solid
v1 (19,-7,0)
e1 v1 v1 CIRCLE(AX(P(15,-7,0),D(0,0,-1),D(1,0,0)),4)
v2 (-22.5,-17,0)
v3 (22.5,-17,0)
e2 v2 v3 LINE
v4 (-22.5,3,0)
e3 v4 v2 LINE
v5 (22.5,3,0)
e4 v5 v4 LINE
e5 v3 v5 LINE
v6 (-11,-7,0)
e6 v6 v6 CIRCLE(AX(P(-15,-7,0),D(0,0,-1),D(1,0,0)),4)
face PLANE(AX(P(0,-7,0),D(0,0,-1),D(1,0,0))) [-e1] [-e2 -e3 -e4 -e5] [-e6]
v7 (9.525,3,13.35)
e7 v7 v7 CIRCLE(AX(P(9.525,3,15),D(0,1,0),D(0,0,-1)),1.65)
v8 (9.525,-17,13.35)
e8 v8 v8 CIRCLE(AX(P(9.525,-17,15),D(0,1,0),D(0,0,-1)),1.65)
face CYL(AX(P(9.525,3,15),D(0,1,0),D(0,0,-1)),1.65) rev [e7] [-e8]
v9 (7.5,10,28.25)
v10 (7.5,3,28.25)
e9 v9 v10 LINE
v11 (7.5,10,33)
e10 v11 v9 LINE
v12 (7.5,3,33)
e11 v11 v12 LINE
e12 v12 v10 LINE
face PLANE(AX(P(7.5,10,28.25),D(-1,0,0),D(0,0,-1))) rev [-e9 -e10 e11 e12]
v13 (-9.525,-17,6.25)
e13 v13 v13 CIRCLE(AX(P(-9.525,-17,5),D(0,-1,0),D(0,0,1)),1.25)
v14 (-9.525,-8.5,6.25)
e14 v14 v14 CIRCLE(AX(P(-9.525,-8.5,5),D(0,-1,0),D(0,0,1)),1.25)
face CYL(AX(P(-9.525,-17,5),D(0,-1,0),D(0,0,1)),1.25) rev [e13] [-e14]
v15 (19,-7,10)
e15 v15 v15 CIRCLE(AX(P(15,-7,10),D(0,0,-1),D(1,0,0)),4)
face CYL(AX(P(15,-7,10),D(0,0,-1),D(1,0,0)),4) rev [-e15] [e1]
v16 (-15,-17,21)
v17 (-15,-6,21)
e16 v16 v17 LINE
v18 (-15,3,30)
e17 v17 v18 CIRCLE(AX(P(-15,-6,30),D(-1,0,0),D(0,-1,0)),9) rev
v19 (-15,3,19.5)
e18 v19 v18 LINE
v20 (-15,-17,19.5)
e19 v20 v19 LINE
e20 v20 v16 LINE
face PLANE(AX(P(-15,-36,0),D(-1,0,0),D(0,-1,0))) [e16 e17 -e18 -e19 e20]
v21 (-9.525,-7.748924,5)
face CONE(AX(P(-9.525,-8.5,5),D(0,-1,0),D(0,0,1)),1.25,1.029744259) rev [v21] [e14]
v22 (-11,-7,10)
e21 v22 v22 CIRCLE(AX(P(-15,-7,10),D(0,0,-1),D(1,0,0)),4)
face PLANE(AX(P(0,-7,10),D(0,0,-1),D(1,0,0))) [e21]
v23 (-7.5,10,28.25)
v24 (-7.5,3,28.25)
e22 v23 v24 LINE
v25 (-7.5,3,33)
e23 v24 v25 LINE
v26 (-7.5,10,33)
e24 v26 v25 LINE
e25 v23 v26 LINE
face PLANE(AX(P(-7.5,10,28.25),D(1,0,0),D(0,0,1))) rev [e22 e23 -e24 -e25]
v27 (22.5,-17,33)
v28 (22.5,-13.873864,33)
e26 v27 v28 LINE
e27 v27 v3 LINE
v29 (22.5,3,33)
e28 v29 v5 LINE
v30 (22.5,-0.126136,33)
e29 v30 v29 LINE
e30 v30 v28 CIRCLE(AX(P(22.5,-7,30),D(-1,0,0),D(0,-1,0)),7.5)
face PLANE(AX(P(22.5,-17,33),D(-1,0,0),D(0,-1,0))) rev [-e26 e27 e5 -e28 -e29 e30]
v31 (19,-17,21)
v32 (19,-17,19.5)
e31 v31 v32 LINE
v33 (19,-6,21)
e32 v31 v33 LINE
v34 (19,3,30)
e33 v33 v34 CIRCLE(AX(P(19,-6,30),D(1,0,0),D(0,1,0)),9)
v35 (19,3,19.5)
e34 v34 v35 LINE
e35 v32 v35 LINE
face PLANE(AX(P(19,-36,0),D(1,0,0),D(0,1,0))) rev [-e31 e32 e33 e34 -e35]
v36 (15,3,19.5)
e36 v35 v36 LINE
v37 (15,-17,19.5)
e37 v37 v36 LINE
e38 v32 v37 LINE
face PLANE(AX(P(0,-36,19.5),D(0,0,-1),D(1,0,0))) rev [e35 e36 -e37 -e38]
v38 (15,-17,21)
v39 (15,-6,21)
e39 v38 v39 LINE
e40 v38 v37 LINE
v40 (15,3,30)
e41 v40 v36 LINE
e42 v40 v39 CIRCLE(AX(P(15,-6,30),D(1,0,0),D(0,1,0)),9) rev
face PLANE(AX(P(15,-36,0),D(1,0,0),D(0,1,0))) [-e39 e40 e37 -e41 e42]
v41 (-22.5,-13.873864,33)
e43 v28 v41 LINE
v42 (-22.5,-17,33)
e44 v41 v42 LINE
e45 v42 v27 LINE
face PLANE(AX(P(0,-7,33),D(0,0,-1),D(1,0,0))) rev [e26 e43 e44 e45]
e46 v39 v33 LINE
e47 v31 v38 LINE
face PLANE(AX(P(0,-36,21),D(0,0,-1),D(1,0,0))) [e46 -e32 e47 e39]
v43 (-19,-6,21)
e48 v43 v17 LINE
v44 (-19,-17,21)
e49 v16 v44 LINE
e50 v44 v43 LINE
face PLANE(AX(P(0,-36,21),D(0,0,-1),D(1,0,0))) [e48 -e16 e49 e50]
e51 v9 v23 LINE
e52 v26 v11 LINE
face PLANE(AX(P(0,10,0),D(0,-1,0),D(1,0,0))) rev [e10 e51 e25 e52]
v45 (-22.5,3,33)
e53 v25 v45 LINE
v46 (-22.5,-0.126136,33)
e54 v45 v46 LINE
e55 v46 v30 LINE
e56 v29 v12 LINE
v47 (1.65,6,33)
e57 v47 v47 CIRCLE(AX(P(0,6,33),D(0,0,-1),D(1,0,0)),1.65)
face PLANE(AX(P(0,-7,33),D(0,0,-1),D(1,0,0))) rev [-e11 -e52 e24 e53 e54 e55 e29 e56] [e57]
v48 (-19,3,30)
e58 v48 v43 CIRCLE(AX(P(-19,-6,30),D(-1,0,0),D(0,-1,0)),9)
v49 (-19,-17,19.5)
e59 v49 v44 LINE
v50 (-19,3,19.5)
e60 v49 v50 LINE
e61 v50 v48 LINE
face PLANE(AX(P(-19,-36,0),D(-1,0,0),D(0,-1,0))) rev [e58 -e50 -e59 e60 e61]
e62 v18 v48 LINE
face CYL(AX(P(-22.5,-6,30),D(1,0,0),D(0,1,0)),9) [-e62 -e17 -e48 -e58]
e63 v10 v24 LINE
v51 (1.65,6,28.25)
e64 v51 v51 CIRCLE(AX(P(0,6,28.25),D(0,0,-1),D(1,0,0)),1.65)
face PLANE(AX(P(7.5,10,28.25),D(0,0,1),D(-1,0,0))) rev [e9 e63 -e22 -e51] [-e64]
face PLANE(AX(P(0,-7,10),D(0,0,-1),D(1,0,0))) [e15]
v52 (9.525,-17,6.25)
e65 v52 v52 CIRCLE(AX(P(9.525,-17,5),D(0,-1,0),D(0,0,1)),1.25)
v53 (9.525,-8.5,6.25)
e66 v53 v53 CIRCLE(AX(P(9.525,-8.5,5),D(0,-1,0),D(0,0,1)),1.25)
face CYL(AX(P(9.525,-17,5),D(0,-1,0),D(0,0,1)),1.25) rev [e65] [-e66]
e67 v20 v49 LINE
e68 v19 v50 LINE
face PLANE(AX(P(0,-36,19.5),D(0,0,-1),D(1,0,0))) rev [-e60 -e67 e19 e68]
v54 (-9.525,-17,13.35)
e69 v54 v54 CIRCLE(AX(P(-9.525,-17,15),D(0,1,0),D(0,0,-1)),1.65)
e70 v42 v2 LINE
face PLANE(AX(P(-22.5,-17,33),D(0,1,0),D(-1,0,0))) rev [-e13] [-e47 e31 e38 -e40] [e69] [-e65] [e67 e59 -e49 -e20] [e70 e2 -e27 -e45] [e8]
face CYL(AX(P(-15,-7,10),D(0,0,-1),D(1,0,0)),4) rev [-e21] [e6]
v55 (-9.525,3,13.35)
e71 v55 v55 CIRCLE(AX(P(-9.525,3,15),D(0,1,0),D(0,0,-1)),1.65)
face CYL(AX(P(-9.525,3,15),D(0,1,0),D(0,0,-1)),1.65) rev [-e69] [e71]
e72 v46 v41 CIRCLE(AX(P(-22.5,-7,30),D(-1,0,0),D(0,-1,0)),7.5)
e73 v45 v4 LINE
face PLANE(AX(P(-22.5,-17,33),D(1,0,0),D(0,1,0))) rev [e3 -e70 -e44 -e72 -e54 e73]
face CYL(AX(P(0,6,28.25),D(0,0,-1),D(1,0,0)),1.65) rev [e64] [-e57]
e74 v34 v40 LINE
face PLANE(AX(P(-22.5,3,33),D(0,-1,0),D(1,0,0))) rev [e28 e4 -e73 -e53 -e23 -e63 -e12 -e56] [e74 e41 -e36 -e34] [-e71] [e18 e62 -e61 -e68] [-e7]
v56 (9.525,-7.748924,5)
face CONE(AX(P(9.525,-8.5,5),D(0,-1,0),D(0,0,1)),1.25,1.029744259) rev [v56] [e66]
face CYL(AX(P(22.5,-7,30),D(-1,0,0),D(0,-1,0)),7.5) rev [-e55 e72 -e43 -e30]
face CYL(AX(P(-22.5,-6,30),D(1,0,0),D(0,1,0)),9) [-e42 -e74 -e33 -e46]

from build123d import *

# Parameters (mm, degrees)
SKETCH2_W                 = 45
SKETCH2_H                 = 20
BOSS_EXTRUDE1_DEPTH       = 33
M4X0_7_TAPPED_HOLE1_D     = 3.3
SKETCH3_R                 = 7.5
CUT_EXTRUDE1_DEPTH        = 45
SKETCH4_R                 = 4
CUT_EXTRUDE2_DEPTH        = 10
M3X0_5_TAPPED_HOLE1_D     = 2.5
M3X0_5_TAPPED_HOLE1_DEPTH = 8.5
M3X0_5_TAPPED_HOLE1_TIP   = 0.751075774
SKETCH5_W                 = 4
SKETCH5_H                 = 1.5
CUT_EXTRUDE3_DEPTH        = 39
FILLET1_R                 = 9
SKETCH8_W                 = 15
SKETCH8_H                 = 4.75
BOSS_EXTRUDE2_DEPTH       = 7
M4X0_7_TAPPED_HOLE3_D     = 3.3
BODY_MOVE_COPY1_ANGLE     = 180


with BuildPart() as part:
    # Sketch2 → Boss-Extrude1 (new body)
    with BuildSketch(Plane.XY):
        Rectangle(SKETCH2_W, SKETCH2_H)
    extrude(amount=BOSS_EXTRUDE1_DEPTH)

    # M4x0.7 Tapped Hole1 (through all)
    with Locations(Plane(origin=(0, -10, 0), x_dir=(-1, 0, 0), z_dir=(0, -1, 0))):
        with Locations((-9.525, -15), (9.525, -15)):
            Hole(M4X0_7_TAPPED_HOLE1_D / 2)

    # Sketch3 → Cut-Extrude1 (cut)
    with BuildSketch(Plane(origin=(22.5, 0, 0), x_dir=(0, 0, -1), z_dir=(1, 0, 0))):
        with Locations((-30, 0)):
            Circle(SKETCH3_R)
    extrude(amount=-CUT_EXTRUDE1_DEPTH, mode=Mode.SUBTRACT)

    # Sketch4 → Cut-Extrude2 (cut)
    with BuildSketch(Plane(origin=(0, 0, 0), x_dir=(-1, 0, 0), z_dir=(0, 0, -1))):
        with Locations((-15, 0)):
            Circle(SKETCH4_R)
        with Locations((15, 0)):
            Circle(SKETCH4_R)
    extrude(amount=-CUT_EXTRUDE2_DEPTH, mode=Mode.SUBTRACT)

    # M3x0.5 Tapped Hole1
    with Locations(Plane(origin=(0, 10, 0), x_dir=(1, 0, 0), z_dir=(0, 1, 0))):
        with Locations((9.525, -5), (-9.525, -5)):
            Hole(M3X0_5_TAPPED_HOLE1_D / 2, depth=M3X0_5_TAPPED_HOLE1_DEPTH)
            with Locations((0, 0, -(M3X0_5_TAPPED_HOLE1_DEPTH + M3X0_5_TAPPED_HOLE1_TIP / 2))):  # 118° drill point
                Cone(0, M3X0_5_TAPPED_HOLE1_D / 2, M3X0_5_TAPPED_HOLE1_TIP, mode=Mode.SUBTRACT)

    # Sketch5 → Cut-Extrude3 (cut)
    with BuildSketch(Plane.XZ.offset(10)):
        with Locations((-17, 20.25)):
            Rectangle(SKETCH5_W, SKETCH5_H)
        with Locations((17, 20.25)):
            Rectangle(SKETCH5_W, SKETCH5_H)
    extrude(amount=-CUT_EXTRUDE3_DEPTH, mode=Mode.SUBTRACT)

    # Fillet1
    fillet1_edges = [part.edges().sort_by_distance(p)[0] for p in [
        (-17, -10, 21),
        (17, -10, 21),
    ]]
    fillet(fillet1_edges, radius=FILLET1_R)

    # Sketch8 → Boss-Extrude2 (add)
    with BuildSketch(Plane.XZ.offset(10)):
        with Locations((0, 30.625)):
            Rectangle(SKETCH8_W, SKETCH8_H)
    extrude(amount=BOSS_EXTRUDE2_DEPTH)

    # M4x0.7 Tapped Hole3 (through all)
    with Locations(Plane(origin=(0, 0, 28.25), x_dir=(-1, 0, 0), z_dir=(0, 0, -1))):
        with Locations((0, -13)):
            Hole(M4X0_7_TAPPED_HOLE3_D / 2)


with BuildPart() as part_1:
    # Body-Move/Copy1: moved
    add(part.part.rotate(Axis((0, -3.5, 0), (0, 0, 1)), BODY_MOVE_COPY1_ANGLE))


solid = part_1.part
